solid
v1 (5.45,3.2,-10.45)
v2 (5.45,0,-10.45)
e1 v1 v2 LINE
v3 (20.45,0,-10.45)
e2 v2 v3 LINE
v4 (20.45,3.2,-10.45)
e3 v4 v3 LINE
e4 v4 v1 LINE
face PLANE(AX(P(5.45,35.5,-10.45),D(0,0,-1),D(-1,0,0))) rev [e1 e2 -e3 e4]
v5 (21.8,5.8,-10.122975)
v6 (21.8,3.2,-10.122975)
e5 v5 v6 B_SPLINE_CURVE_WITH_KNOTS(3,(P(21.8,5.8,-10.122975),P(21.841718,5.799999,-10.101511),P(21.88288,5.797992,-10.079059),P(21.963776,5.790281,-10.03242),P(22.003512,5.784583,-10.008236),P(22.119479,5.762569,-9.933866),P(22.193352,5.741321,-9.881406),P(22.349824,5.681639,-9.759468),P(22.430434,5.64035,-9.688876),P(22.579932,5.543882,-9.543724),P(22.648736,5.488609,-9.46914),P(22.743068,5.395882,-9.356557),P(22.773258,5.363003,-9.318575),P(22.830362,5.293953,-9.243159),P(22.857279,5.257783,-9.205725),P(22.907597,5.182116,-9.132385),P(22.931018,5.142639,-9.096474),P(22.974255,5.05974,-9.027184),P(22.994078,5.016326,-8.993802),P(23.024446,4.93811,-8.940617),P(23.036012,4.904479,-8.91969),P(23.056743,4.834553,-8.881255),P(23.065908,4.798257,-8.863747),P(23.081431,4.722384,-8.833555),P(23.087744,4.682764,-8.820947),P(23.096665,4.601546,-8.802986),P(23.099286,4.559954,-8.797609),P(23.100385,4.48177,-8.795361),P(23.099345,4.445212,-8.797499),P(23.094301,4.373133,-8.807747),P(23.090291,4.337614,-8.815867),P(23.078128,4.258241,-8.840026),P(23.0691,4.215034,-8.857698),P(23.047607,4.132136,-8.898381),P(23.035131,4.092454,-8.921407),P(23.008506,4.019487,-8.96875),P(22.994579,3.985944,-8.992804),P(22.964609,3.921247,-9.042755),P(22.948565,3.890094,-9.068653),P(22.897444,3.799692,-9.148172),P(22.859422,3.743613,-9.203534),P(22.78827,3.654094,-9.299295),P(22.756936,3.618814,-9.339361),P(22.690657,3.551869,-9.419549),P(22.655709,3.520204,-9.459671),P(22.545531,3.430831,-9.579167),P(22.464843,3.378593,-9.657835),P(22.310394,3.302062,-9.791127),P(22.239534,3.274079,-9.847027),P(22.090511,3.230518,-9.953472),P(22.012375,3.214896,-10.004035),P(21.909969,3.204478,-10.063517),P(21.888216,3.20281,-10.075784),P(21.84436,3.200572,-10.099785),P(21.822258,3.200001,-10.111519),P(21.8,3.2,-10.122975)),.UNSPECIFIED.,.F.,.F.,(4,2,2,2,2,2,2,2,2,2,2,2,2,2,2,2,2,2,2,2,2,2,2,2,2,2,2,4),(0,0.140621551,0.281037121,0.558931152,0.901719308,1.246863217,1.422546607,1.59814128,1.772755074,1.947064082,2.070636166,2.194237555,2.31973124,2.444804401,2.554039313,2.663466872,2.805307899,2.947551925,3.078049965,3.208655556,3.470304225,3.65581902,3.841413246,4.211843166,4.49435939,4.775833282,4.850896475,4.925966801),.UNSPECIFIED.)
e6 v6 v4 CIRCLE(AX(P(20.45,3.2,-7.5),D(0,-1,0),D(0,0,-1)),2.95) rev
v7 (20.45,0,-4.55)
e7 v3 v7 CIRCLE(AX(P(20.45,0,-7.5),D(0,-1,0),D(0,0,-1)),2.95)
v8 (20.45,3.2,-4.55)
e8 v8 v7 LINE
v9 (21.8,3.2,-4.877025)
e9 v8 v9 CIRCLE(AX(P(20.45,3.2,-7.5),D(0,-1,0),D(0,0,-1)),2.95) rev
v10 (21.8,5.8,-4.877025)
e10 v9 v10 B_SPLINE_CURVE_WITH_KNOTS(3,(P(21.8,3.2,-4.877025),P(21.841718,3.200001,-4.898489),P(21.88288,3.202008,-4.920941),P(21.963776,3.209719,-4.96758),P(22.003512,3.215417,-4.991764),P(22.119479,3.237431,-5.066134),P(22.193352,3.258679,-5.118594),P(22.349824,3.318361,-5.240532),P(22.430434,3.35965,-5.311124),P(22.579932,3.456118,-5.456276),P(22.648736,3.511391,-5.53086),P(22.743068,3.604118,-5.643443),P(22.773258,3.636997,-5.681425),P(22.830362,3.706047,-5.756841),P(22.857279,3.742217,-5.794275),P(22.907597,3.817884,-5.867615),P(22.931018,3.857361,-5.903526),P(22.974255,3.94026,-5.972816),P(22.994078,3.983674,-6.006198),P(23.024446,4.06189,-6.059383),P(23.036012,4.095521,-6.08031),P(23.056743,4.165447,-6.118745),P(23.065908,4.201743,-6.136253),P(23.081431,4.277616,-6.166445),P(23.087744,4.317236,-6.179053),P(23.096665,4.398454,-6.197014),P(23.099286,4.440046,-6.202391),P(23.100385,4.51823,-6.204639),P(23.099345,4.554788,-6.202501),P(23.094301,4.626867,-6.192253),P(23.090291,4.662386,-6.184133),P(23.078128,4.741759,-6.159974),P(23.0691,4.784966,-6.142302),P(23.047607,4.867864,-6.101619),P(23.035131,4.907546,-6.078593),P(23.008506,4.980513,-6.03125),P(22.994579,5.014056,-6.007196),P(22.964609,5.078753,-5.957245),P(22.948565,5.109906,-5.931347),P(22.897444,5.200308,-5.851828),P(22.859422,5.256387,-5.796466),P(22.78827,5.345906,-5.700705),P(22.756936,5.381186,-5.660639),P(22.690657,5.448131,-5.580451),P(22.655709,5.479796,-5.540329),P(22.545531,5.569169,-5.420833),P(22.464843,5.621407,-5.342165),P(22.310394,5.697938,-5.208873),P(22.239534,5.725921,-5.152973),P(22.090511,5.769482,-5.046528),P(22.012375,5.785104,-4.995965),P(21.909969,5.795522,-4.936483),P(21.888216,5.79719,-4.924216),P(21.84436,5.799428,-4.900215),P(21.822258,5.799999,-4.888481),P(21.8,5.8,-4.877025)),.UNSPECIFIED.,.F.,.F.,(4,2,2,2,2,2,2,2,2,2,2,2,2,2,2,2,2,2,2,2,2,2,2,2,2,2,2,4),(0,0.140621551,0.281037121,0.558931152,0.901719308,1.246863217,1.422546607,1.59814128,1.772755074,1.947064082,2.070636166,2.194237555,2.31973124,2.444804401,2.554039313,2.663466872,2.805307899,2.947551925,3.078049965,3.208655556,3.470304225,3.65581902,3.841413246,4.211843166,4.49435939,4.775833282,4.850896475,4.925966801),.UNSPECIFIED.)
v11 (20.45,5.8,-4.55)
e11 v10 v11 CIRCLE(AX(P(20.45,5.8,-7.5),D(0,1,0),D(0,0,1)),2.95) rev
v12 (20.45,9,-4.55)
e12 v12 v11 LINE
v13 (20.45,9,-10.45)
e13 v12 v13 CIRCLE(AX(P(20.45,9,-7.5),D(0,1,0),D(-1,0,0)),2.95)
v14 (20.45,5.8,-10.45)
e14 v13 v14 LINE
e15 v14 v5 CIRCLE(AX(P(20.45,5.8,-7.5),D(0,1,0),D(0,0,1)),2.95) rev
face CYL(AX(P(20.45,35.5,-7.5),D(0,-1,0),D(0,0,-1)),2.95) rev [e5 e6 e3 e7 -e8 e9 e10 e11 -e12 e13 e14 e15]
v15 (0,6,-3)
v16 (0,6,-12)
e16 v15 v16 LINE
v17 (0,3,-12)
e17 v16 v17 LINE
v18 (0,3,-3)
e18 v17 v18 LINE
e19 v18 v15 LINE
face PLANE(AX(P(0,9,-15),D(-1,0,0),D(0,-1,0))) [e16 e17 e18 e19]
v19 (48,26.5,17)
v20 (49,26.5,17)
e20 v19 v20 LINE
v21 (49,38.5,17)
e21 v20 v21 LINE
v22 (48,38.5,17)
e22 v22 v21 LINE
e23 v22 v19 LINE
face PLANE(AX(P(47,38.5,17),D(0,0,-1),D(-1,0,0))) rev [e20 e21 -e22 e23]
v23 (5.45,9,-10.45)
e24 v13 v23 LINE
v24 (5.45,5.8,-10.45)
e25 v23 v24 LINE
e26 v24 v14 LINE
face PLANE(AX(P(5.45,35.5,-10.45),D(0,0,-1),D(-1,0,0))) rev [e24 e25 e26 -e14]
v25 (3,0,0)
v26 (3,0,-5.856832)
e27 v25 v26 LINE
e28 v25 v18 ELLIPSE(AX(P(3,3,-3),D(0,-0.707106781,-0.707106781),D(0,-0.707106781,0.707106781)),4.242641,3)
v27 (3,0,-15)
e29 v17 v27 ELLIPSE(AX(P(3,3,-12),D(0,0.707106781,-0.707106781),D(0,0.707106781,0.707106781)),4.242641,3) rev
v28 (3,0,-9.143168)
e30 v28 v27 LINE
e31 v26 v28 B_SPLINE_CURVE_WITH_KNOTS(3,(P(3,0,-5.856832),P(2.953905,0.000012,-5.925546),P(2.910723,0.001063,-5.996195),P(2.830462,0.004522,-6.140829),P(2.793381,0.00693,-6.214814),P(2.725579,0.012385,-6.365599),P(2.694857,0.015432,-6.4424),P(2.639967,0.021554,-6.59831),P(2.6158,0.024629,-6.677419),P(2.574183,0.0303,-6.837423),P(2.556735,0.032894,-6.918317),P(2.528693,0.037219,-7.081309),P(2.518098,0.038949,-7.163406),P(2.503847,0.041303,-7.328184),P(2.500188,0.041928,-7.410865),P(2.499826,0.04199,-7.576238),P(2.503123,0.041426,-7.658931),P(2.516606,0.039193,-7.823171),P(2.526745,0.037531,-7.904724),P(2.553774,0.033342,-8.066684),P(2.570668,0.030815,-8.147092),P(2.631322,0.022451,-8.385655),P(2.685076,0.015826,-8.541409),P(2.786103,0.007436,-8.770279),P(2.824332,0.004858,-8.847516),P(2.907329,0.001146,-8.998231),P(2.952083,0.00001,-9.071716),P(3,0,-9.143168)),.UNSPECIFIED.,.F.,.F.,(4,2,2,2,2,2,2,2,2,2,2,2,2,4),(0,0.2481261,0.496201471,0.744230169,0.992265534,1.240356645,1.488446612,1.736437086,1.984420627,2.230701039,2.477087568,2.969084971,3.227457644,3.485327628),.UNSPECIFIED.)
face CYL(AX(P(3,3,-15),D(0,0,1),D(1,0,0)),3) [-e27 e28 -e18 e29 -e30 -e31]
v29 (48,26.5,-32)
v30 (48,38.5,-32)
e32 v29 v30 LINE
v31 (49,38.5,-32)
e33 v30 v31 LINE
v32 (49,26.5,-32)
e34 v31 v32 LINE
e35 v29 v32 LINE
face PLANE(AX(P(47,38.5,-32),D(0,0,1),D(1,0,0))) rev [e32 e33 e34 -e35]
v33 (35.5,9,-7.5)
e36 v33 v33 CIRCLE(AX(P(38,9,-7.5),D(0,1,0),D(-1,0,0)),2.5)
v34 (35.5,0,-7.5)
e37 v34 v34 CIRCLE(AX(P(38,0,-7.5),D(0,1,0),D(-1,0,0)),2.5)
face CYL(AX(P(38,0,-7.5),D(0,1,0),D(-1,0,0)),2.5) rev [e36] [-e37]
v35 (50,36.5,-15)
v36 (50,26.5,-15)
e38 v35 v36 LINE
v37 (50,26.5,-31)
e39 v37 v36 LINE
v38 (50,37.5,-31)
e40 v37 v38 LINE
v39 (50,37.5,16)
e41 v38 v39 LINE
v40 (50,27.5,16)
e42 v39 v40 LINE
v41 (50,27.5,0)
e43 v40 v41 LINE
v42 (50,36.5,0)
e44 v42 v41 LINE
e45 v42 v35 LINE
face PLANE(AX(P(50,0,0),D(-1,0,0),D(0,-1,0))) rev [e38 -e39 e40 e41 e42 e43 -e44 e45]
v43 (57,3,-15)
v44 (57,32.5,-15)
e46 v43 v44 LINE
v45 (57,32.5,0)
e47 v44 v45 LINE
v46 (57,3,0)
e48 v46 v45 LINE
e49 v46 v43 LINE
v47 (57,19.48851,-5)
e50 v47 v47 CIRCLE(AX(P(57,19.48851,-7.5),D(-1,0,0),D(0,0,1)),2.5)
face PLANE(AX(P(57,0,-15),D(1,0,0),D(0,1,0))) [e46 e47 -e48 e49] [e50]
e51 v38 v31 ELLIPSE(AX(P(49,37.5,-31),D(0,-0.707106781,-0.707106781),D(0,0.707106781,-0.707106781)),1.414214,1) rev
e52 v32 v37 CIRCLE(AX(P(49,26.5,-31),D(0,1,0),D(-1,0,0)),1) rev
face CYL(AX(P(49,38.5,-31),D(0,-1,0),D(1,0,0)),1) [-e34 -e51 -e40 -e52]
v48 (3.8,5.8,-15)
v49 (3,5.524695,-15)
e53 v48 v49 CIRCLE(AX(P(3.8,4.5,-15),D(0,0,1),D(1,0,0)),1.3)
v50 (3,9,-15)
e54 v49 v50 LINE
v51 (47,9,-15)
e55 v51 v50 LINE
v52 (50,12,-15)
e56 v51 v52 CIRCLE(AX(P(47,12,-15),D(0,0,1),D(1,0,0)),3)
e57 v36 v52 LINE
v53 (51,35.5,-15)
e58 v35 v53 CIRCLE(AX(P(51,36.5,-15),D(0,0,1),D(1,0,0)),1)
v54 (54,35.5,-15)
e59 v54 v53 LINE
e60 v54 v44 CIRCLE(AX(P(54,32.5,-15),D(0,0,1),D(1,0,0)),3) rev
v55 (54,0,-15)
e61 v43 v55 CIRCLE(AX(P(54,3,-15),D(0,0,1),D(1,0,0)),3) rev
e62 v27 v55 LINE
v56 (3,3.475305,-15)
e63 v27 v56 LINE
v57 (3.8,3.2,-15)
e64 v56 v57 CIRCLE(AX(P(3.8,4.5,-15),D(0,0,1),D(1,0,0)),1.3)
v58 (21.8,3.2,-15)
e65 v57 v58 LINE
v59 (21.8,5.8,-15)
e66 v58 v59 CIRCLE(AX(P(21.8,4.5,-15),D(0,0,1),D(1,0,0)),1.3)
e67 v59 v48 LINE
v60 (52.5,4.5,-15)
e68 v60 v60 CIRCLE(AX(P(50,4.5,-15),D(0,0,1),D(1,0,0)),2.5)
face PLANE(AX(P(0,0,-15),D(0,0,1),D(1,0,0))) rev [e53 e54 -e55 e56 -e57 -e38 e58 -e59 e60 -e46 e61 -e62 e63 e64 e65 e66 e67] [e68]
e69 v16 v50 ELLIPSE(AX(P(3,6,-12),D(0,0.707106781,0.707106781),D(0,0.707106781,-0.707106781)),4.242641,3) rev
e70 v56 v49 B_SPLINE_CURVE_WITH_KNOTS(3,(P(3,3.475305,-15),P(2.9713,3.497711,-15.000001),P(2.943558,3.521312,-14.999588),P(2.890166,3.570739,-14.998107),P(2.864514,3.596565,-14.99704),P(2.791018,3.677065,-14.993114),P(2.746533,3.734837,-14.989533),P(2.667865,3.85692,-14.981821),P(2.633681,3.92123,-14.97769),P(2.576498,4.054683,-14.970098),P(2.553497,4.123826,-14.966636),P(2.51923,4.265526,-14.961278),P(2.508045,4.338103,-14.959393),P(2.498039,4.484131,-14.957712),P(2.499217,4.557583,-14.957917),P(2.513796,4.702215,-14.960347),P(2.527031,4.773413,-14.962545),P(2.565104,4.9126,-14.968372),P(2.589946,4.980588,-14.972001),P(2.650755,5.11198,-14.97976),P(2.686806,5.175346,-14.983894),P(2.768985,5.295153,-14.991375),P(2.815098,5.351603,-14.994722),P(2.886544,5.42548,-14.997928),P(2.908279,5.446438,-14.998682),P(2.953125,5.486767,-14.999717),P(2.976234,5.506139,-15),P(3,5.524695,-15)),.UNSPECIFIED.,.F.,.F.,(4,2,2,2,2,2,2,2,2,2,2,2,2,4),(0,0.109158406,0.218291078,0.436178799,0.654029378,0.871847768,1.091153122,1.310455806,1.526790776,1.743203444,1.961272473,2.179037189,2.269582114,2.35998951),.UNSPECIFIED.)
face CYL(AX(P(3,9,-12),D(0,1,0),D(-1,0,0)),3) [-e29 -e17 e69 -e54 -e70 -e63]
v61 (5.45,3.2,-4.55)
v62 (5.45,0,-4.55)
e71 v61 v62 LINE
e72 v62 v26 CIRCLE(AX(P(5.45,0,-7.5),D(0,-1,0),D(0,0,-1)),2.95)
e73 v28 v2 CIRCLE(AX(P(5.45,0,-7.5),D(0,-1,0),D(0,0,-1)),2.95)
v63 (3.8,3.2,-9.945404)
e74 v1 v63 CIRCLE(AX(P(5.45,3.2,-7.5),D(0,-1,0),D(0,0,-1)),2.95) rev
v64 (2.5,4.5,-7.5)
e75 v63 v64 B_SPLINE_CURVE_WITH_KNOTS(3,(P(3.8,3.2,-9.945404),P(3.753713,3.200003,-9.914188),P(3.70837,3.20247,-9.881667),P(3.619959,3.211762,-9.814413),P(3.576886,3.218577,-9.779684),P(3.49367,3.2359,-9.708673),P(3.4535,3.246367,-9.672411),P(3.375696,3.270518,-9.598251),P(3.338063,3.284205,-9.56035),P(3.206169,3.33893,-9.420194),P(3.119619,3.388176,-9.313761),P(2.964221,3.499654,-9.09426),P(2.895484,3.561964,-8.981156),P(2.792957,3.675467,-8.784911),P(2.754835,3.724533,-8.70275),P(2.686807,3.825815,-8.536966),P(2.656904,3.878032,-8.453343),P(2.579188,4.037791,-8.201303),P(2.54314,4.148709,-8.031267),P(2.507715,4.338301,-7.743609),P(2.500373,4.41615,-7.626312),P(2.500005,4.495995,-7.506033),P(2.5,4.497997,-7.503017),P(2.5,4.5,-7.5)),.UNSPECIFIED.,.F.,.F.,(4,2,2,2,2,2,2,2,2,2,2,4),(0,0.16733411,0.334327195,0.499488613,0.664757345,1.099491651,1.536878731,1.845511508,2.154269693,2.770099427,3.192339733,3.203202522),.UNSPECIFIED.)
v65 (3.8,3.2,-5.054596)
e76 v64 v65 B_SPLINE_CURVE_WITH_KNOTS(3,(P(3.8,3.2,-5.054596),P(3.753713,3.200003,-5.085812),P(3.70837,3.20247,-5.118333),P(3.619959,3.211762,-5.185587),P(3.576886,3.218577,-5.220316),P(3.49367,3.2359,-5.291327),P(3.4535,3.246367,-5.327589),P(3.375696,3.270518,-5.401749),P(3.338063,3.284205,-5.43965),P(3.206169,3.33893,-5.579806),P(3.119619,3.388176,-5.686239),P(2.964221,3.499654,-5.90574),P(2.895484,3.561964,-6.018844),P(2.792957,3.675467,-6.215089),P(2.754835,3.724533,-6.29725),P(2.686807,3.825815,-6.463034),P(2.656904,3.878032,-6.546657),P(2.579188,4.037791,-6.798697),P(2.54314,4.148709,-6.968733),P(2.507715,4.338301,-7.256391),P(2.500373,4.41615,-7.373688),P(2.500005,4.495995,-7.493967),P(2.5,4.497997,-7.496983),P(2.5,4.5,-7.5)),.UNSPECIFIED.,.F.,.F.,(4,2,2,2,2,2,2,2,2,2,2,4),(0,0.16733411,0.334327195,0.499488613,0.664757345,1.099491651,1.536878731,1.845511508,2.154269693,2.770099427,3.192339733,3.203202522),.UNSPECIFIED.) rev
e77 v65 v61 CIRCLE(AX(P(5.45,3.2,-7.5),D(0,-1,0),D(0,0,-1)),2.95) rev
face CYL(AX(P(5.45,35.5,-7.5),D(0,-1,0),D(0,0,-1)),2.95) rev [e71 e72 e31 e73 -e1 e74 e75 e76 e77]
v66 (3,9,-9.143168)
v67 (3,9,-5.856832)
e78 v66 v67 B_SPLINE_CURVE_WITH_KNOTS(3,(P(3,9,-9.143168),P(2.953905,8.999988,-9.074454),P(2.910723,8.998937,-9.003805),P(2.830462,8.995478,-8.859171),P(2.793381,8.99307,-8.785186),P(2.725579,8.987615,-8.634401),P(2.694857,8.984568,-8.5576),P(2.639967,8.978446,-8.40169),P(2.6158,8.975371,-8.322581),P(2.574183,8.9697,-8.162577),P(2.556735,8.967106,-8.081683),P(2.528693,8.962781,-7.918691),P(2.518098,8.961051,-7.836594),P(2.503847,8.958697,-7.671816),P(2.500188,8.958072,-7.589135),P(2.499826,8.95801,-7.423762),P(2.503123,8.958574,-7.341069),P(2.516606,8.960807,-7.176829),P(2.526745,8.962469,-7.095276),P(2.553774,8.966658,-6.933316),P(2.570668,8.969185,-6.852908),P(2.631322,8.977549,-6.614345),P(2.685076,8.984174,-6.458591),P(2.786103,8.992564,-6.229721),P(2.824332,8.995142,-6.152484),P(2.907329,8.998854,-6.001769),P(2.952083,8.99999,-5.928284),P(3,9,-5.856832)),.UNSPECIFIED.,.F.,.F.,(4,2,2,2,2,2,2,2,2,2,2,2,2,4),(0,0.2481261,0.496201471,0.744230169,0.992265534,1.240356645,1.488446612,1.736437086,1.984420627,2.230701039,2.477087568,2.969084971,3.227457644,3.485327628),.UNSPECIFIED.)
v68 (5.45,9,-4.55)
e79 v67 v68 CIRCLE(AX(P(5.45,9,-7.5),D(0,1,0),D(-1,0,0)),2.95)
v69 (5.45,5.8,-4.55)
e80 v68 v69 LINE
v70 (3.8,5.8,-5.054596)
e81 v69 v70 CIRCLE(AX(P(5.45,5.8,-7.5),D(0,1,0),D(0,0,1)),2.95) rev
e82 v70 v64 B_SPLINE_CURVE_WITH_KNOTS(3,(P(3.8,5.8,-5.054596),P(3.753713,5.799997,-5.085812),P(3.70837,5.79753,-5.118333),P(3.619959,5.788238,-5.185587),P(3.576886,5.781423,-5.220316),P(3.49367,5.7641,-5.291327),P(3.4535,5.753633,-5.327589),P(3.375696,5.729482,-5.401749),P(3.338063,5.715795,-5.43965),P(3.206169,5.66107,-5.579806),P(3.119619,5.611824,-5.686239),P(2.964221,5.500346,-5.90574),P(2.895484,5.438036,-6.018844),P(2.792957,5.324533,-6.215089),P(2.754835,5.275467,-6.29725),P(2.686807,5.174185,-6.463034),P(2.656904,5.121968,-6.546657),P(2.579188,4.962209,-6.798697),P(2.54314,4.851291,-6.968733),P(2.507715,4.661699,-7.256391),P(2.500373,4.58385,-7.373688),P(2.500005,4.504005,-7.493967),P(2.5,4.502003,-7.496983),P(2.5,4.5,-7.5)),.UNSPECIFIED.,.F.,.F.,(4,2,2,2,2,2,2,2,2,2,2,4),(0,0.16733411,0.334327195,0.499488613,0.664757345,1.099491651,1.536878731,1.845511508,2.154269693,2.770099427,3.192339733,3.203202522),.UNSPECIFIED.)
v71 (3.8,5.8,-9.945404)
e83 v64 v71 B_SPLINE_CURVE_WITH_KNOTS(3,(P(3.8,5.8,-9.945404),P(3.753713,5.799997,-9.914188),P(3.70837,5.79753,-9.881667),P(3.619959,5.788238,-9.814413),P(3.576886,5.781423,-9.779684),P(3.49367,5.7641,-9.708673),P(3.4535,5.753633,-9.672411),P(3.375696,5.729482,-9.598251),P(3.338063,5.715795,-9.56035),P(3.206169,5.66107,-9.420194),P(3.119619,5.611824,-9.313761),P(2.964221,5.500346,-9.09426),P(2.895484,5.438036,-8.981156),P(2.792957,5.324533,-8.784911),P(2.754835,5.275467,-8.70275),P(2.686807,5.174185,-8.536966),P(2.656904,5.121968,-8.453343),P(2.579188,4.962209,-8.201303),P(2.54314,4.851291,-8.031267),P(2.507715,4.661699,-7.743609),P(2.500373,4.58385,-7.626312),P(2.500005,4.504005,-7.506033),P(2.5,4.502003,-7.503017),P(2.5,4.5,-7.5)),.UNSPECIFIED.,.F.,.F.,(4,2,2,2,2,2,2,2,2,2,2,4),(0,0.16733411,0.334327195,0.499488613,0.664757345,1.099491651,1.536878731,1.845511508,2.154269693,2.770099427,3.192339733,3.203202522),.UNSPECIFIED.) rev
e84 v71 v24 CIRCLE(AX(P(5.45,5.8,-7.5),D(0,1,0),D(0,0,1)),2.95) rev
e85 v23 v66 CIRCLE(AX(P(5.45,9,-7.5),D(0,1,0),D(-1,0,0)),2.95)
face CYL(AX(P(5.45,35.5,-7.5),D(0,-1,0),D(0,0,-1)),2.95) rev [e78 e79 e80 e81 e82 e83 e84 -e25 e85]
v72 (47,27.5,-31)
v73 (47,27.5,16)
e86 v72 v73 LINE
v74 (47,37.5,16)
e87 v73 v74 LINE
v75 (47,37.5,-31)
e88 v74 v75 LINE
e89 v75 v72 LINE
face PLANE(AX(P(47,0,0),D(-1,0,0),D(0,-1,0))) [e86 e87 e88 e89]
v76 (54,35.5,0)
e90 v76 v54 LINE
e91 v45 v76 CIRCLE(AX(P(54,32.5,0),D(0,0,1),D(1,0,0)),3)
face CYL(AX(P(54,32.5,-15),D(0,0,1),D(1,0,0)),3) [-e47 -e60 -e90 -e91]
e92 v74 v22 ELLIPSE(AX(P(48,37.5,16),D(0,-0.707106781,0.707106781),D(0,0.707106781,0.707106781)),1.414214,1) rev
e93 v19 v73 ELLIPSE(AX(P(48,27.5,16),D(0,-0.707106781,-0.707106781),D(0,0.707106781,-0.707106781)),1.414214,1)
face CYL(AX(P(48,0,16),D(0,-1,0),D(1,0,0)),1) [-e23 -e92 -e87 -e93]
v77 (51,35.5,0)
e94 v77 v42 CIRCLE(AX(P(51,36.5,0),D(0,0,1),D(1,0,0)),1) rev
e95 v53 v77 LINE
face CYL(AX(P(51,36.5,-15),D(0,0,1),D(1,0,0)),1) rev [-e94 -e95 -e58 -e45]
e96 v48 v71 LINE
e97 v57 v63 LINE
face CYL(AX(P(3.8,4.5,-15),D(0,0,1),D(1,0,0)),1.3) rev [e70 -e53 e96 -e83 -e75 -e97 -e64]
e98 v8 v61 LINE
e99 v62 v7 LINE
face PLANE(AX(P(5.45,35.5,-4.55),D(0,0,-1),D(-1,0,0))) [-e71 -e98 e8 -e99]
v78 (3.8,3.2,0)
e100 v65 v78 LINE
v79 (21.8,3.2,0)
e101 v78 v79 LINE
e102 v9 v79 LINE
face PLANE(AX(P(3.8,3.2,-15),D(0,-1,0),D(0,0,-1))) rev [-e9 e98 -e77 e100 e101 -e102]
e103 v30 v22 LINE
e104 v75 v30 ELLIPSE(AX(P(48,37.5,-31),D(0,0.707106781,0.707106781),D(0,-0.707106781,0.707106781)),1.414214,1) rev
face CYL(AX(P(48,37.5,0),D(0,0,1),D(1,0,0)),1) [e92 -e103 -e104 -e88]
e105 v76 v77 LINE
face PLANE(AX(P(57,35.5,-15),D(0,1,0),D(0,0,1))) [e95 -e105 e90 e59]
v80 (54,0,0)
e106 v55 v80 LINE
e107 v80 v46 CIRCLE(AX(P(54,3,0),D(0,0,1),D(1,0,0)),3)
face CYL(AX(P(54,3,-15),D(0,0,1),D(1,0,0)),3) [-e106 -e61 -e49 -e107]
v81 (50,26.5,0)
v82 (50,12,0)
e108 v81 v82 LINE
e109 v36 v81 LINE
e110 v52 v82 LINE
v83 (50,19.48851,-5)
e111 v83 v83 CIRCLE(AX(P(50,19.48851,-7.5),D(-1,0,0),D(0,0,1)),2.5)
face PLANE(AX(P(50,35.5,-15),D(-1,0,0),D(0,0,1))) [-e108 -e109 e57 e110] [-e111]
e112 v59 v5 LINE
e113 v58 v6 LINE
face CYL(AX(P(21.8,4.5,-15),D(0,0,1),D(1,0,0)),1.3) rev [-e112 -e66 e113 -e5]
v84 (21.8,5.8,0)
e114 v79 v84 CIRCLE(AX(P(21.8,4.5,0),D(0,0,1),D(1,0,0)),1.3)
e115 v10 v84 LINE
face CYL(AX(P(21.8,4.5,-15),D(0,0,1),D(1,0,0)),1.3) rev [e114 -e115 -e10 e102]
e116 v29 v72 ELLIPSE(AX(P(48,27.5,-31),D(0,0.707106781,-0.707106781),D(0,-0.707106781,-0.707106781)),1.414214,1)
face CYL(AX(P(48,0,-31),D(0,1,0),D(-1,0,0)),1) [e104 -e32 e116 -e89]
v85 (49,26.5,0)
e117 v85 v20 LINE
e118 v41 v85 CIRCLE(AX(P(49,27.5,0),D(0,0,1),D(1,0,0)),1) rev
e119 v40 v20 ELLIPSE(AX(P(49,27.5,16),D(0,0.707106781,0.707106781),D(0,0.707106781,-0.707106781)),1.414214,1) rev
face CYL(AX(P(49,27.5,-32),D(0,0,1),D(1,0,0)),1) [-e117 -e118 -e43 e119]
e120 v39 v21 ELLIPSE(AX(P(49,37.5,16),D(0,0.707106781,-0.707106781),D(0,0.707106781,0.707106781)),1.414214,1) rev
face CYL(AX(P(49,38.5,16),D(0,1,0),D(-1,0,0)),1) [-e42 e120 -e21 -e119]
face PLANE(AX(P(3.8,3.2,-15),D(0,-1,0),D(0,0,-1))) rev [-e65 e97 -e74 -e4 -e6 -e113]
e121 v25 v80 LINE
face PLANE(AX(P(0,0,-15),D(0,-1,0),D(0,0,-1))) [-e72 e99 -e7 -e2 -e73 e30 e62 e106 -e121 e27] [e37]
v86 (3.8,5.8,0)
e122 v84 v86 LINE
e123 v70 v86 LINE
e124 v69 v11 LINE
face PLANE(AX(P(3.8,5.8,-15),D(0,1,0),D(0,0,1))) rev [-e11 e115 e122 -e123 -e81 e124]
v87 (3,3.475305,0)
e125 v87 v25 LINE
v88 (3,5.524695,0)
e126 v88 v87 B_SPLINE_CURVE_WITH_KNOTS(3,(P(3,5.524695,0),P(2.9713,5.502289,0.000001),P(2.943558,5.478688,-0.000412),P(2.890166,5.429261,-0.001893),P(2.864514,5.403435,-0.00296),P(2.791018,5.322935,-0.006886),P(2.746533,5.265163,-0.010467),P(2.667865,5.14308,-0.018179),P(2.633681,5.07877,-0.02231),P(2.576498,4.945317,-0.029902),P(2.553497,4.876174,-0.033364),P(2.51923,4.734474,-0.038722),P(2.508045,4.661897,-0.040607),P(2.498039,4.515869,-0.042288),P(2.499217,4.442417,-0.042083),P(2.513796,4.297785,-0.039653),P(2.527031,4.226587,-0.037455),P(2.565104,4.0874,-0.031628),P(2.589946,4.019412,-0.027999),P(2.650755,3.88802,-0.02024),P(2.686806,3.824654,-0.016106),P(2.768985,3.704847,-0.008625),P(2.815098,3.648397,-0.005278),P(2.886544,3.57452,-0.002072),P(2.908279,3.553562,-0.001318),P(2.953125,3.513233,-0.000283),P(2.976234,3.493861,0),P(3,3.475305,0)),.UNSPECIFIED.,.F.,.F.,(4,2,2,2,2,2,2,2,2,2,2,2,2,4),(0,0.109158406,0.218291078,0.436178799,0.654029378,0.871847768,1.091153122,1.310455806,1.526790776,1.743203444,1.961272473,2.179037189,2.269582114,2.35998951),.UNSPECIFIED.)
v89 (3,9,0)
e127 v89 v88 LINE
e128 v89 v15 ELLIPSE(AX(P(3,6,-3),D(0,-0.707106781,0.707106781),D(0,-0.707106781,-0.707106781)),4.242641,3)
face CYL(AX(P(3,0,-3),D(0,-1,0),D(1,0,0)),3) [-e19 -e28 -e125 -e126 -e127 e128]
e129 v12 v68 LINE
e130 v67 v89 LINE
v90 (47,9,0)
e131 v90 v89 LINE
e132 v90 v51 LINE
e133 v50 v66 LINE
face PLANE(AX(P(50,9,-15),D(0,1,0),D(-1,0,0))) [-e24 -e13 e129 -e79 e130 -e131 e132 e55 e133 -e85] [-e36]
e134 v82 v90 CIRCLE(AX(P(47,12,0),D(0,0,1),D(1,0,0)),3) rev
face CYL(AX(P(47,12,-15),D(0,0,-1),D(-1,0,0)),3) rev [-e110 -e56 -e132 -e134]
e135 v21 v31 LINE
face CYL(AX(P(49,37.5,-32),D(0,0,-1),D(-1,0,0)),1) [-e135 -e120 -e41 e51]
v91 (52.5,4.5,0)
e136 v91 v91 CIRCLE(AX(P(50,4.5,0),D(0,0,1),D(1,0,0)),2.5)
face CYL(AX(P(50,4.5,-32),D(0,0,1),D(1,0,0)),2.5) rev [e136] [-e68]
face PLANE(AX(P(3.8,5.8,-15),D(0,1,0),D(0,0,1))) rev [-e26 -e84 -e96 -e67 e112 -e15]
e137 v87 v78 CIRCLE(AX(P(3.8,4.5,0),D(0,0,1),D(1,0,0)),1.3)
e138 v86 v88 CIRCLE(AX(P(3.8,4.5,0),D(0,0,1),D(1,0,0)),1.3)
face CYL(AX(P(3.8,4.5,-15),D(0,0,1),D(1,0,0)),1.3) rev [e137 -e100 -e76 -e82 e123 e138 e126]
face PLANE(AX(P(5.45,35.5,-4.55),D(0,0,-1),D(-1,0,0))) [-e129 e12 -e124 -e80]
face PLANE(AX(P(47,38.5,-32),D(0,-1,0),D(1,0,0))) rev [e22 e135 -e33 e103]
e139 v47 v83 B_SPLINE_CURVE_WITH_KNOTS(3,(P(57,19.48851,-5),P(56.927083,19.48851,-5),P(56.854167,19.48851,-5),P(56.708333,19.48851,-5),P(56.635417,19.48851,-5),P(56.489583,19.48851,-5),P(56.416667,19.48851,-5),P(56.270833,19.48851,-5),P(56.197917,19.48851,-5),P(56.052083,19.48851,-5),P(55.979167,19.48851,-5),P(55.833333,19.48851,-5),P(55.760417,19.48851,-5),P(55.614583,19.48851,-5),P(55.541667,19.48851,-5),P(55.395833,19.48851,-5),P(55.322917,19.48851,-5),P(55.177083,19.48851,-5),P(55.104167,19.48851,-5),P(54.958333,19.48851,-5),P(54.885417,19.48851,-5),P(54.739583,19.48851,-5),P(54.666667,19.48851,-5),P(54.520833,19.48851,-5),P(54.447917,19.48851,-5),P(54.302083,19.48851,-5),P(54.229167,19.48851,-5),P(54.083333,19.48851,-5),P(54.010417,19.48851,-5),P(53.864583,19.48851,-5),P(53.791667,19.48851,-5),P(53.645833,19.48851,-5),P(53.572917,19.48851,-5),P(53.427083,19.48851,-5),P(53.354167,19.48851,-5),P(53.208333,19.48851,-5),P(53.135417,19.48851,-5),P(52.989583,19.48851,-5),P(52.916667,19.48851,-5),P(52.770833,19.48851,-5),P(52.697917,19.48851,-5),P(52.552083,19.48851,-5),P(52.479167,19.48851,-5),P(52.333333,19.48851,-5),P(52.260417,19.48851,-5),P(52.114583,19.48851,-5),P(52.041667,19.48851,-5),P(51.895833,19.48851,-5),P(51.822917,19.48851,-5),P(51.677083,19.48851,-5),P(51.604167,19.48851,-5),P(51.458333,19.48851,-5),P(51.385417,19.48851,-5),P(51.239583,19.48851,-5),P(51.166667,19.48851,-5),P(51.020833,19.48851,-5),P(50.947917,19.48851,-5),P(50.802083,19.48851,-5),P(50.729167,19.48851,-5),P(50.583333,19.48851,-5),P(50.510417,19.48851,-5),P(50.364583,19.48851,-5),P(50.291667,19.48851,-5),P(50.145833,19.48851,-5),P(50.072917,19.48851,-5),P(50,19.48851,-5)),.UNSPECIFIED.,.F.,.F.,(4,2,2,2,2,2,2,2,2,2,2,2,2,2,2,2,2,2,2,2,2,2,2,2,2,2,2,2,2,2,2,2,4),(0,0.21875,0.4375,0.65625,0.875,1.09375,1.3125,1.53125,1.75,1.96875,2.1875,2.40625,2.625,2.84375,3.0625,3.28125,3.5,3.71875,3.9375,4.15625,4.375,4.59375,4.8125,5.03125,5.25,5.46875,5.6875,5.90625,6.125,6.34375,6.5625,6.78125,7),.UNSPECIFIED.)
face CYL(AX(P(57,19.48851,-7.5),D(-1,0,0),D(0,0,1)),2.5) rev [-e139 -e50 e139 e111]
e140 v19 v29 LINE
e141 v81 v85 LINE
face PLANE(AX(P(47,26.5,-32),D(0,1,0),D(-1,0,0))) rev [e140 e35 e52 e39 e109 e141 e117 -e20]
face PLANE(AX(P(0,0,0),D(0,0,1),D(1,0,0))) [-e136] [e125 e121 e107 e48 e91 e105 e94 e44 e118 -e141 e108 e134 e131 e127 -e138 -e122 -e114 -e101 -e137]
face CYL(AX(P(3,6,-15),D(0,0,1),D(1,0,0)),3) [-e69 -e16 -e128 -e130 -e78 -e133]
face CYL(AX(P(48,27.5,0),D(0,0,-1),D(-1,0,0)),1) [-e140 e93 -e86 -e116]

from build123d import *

# Parameters (mm, degrees)
BOSS_EXTRUDE1_DEPTH = 15
CUT_EXTRUDE1_DEPTH  = 69.805886376
CUT_EXTRUDE2_DEPTH  = 69.805886376
SKETCH4_W           = 49
SKETCH4_H           = 12
BOSS_EXTRUDE2_DEPTH = 3
SKETCH5_R           = 2.5
CUT_EXTRUDE3_DEPTH  = 76.863364017
FILLET1_R           = 3
FILLET2_R           = 3
FILLET3_R           = 1
FILLET4_R           = 3
FILLET5_R           = 1
SKETCH6_R           = 2.5
CUT_EXTRUDE4_DEPTH  = 71.754858561
SKETCH7_R           = 2.5
CUT_EXTRUDE5_DEPTH  = 72.716455573


with BuildPart() as part:
    # Sketch1 → Boss-Extrude1 (new body)
    with BuildSketch(Plane.XY):
        Polygon((0, 0), (57, 0), (57, 35.5), (50, 35.5), (50, 9), (0, 9), align=None)
    extrude(amount=-BOSS_EXTRUDE1_DEPTH)

    # Sketch2 → Cut-Extrude1 (cut, through all)
    with BuildSketch(Plane.XZ):
        with BuildLine():
            Line((5.45, -4.55), (20.45, -4.55))
            ThreePointArc((20.45, -4.55), (23.4, -7.5), (20.45, -10.45))
            Line((20.45, -10.45), (5.45, -10.45))
            ThreePointArc((5.45, -10.45), (2.5, -7.5), (5.45, -4.55))
        make_face()
    extrude(amount=-CUT_EXTRUDE1_DEPTH, mode=Mode.SUBTRACT)

    # Sketch3 → Cut-Extrude2 (cut, through all)
    with BuildSketch(Plane.XY):
        with BuildLine():
            Line((3.8, 5.8), (21.8, 5.8))
            ThreePointArc((21.8, 5.8), (23.1, 4.5), (21.8, 3.2))
            Line((21.8, 3.2), (3.8, 3.2))
            ThreePointArc((3.8, 3.2), (2.5, 4.5), (3.8, 5.8))
        make_face()
    extrude(amount=-CUT_EXTRUDE2_DEPTH, mode=Mode.SUBTRACT)

    # Sketch4 → Boss-Extrude2 (add)
    with BuildSketch(Plane.ZY.offset(-50)):
        with Locations((-7.5, 32.5)):
            Rectangle(SKETCH4_W, SKETCH4_H)
    extrude(amount=BOSS_EXTRUDE2_DEPTH)

    # Sketch5 → Cut-Extrude3 (cut, through all)
    with BuildSketch(Plane.XY):
        with Locations((50, 4.5)):
            Circle(SKETCH5_R)
    extrude(amount=-CUT_EXTRUDE3_DEPTH, mode=Mode.SUBTRACT)

    # Fillet1
    fillet1_edges = [part.edges().sort_by_distance(p)[0] for p in [
        (50, 9, -7.5),
        (57, 0, -7.5),
    ]]
    fillet(fillet1_edges, radius=FILLET1_R)

    # Fillet2
    # the kernel refuses this fillet: 3 mm, written as the material it takes off along each edge
    with BuildSketch(Plane(origin=(0, 9, 7.5), x_dir=(0, -1, 0), z_dir=(0, 0, -1)), Plane(origin=(0, 0, 7.5), x_dir=(1, 0, 0), z_dir=(0, 0, -1))) as fillet2_piece_1:
        with BuildLine():
            CenterArc((FILLET2_R, -FILLET2_R), FILLET2_R, 90, 90)
            Line((0, -FILLET2_R), (0, 0))
            Line((0, 0), (FILLET2_R, 0))
        make_face()
    extrude(amount=30, mode=Mode.SUBTRACT)
    with BuildSketch(Plane(origin=(0, 16.5, -15), x_dir=(0, 0, 1), z_dir=(0, -1, 0)), Plane(origin=(0, 16.5, 0), x_dir=(1, 0, 0), z_dir=(0, -1, 0))) as fillet2_piece_2:
        with BuildLine():
            CenterArc((FILLET2_R, -FILLET2_R), FILLET2_R, 90, 90)
            Line((0, -FILLET2_R), (0, 0))
            Line((0, 0), (FILLET2_R, 0))
        make_face()
    extrude(amount=24, mode=Mode.SUBTRACT)

    # Fillet3
    fillet3_edges = [part.edges().sort_by_distance(p)[0] for p in [
        (50, 26.5, 8.5),
        (50, 32.5, -32),
        (50, 38.5, -7.5),
        (50, 32.5, 17),
        (47, 32.5, -32),
        (47, 32.5, 17),
        (47, 26.5, -7.5),
        (47, 38.5, -7.5),
    ]]
    fillet(fillet3_edges, radius=FILLET3_R)

    # Fillet4
    fillet4_edges = [part.edges().sort_by_distance(p)[0] for p in [
        (57, 35.5, -7.5),
    ]]
    fillet(fillet4_edges, radius=FILLET4_R)

    # Fillet5
    fillet5_edges = [part.edges().sort_by_distance(p)[0] for p in [
        (50, 35.5, -7.5),
    ]]
    fillet(fillet5_edges, radius=FILLET5_R)

    # Sketch6 → Cut-Extrude4 (cut, through all)
    with BuildSketch(Plane.ZY.offset(-50)):
        with Locations((-7.5, 19.488510255)):
            Circle(SKETCH6_R)
    extrude(amount=-CUT_EXTRUDE4_DEPTH, mode=Mode.SUBTRACT)

    # Sketch7 → Cut-Extrude5 (cut, through all)
    with BuildSketch(Plane(origin=(0, 9, 0), x_dir=(1, 0, 0), z_dir=(0, 1, 0))):
        with Locations(Location((38, 7.5, 0), (0, 0, 180))):
            Circle(SKETCH7_R)
    extrude(amount=-CUT_EXTRUDE5_DEPTH, mode=Mode.SUBTRACT)


solid = part.part
